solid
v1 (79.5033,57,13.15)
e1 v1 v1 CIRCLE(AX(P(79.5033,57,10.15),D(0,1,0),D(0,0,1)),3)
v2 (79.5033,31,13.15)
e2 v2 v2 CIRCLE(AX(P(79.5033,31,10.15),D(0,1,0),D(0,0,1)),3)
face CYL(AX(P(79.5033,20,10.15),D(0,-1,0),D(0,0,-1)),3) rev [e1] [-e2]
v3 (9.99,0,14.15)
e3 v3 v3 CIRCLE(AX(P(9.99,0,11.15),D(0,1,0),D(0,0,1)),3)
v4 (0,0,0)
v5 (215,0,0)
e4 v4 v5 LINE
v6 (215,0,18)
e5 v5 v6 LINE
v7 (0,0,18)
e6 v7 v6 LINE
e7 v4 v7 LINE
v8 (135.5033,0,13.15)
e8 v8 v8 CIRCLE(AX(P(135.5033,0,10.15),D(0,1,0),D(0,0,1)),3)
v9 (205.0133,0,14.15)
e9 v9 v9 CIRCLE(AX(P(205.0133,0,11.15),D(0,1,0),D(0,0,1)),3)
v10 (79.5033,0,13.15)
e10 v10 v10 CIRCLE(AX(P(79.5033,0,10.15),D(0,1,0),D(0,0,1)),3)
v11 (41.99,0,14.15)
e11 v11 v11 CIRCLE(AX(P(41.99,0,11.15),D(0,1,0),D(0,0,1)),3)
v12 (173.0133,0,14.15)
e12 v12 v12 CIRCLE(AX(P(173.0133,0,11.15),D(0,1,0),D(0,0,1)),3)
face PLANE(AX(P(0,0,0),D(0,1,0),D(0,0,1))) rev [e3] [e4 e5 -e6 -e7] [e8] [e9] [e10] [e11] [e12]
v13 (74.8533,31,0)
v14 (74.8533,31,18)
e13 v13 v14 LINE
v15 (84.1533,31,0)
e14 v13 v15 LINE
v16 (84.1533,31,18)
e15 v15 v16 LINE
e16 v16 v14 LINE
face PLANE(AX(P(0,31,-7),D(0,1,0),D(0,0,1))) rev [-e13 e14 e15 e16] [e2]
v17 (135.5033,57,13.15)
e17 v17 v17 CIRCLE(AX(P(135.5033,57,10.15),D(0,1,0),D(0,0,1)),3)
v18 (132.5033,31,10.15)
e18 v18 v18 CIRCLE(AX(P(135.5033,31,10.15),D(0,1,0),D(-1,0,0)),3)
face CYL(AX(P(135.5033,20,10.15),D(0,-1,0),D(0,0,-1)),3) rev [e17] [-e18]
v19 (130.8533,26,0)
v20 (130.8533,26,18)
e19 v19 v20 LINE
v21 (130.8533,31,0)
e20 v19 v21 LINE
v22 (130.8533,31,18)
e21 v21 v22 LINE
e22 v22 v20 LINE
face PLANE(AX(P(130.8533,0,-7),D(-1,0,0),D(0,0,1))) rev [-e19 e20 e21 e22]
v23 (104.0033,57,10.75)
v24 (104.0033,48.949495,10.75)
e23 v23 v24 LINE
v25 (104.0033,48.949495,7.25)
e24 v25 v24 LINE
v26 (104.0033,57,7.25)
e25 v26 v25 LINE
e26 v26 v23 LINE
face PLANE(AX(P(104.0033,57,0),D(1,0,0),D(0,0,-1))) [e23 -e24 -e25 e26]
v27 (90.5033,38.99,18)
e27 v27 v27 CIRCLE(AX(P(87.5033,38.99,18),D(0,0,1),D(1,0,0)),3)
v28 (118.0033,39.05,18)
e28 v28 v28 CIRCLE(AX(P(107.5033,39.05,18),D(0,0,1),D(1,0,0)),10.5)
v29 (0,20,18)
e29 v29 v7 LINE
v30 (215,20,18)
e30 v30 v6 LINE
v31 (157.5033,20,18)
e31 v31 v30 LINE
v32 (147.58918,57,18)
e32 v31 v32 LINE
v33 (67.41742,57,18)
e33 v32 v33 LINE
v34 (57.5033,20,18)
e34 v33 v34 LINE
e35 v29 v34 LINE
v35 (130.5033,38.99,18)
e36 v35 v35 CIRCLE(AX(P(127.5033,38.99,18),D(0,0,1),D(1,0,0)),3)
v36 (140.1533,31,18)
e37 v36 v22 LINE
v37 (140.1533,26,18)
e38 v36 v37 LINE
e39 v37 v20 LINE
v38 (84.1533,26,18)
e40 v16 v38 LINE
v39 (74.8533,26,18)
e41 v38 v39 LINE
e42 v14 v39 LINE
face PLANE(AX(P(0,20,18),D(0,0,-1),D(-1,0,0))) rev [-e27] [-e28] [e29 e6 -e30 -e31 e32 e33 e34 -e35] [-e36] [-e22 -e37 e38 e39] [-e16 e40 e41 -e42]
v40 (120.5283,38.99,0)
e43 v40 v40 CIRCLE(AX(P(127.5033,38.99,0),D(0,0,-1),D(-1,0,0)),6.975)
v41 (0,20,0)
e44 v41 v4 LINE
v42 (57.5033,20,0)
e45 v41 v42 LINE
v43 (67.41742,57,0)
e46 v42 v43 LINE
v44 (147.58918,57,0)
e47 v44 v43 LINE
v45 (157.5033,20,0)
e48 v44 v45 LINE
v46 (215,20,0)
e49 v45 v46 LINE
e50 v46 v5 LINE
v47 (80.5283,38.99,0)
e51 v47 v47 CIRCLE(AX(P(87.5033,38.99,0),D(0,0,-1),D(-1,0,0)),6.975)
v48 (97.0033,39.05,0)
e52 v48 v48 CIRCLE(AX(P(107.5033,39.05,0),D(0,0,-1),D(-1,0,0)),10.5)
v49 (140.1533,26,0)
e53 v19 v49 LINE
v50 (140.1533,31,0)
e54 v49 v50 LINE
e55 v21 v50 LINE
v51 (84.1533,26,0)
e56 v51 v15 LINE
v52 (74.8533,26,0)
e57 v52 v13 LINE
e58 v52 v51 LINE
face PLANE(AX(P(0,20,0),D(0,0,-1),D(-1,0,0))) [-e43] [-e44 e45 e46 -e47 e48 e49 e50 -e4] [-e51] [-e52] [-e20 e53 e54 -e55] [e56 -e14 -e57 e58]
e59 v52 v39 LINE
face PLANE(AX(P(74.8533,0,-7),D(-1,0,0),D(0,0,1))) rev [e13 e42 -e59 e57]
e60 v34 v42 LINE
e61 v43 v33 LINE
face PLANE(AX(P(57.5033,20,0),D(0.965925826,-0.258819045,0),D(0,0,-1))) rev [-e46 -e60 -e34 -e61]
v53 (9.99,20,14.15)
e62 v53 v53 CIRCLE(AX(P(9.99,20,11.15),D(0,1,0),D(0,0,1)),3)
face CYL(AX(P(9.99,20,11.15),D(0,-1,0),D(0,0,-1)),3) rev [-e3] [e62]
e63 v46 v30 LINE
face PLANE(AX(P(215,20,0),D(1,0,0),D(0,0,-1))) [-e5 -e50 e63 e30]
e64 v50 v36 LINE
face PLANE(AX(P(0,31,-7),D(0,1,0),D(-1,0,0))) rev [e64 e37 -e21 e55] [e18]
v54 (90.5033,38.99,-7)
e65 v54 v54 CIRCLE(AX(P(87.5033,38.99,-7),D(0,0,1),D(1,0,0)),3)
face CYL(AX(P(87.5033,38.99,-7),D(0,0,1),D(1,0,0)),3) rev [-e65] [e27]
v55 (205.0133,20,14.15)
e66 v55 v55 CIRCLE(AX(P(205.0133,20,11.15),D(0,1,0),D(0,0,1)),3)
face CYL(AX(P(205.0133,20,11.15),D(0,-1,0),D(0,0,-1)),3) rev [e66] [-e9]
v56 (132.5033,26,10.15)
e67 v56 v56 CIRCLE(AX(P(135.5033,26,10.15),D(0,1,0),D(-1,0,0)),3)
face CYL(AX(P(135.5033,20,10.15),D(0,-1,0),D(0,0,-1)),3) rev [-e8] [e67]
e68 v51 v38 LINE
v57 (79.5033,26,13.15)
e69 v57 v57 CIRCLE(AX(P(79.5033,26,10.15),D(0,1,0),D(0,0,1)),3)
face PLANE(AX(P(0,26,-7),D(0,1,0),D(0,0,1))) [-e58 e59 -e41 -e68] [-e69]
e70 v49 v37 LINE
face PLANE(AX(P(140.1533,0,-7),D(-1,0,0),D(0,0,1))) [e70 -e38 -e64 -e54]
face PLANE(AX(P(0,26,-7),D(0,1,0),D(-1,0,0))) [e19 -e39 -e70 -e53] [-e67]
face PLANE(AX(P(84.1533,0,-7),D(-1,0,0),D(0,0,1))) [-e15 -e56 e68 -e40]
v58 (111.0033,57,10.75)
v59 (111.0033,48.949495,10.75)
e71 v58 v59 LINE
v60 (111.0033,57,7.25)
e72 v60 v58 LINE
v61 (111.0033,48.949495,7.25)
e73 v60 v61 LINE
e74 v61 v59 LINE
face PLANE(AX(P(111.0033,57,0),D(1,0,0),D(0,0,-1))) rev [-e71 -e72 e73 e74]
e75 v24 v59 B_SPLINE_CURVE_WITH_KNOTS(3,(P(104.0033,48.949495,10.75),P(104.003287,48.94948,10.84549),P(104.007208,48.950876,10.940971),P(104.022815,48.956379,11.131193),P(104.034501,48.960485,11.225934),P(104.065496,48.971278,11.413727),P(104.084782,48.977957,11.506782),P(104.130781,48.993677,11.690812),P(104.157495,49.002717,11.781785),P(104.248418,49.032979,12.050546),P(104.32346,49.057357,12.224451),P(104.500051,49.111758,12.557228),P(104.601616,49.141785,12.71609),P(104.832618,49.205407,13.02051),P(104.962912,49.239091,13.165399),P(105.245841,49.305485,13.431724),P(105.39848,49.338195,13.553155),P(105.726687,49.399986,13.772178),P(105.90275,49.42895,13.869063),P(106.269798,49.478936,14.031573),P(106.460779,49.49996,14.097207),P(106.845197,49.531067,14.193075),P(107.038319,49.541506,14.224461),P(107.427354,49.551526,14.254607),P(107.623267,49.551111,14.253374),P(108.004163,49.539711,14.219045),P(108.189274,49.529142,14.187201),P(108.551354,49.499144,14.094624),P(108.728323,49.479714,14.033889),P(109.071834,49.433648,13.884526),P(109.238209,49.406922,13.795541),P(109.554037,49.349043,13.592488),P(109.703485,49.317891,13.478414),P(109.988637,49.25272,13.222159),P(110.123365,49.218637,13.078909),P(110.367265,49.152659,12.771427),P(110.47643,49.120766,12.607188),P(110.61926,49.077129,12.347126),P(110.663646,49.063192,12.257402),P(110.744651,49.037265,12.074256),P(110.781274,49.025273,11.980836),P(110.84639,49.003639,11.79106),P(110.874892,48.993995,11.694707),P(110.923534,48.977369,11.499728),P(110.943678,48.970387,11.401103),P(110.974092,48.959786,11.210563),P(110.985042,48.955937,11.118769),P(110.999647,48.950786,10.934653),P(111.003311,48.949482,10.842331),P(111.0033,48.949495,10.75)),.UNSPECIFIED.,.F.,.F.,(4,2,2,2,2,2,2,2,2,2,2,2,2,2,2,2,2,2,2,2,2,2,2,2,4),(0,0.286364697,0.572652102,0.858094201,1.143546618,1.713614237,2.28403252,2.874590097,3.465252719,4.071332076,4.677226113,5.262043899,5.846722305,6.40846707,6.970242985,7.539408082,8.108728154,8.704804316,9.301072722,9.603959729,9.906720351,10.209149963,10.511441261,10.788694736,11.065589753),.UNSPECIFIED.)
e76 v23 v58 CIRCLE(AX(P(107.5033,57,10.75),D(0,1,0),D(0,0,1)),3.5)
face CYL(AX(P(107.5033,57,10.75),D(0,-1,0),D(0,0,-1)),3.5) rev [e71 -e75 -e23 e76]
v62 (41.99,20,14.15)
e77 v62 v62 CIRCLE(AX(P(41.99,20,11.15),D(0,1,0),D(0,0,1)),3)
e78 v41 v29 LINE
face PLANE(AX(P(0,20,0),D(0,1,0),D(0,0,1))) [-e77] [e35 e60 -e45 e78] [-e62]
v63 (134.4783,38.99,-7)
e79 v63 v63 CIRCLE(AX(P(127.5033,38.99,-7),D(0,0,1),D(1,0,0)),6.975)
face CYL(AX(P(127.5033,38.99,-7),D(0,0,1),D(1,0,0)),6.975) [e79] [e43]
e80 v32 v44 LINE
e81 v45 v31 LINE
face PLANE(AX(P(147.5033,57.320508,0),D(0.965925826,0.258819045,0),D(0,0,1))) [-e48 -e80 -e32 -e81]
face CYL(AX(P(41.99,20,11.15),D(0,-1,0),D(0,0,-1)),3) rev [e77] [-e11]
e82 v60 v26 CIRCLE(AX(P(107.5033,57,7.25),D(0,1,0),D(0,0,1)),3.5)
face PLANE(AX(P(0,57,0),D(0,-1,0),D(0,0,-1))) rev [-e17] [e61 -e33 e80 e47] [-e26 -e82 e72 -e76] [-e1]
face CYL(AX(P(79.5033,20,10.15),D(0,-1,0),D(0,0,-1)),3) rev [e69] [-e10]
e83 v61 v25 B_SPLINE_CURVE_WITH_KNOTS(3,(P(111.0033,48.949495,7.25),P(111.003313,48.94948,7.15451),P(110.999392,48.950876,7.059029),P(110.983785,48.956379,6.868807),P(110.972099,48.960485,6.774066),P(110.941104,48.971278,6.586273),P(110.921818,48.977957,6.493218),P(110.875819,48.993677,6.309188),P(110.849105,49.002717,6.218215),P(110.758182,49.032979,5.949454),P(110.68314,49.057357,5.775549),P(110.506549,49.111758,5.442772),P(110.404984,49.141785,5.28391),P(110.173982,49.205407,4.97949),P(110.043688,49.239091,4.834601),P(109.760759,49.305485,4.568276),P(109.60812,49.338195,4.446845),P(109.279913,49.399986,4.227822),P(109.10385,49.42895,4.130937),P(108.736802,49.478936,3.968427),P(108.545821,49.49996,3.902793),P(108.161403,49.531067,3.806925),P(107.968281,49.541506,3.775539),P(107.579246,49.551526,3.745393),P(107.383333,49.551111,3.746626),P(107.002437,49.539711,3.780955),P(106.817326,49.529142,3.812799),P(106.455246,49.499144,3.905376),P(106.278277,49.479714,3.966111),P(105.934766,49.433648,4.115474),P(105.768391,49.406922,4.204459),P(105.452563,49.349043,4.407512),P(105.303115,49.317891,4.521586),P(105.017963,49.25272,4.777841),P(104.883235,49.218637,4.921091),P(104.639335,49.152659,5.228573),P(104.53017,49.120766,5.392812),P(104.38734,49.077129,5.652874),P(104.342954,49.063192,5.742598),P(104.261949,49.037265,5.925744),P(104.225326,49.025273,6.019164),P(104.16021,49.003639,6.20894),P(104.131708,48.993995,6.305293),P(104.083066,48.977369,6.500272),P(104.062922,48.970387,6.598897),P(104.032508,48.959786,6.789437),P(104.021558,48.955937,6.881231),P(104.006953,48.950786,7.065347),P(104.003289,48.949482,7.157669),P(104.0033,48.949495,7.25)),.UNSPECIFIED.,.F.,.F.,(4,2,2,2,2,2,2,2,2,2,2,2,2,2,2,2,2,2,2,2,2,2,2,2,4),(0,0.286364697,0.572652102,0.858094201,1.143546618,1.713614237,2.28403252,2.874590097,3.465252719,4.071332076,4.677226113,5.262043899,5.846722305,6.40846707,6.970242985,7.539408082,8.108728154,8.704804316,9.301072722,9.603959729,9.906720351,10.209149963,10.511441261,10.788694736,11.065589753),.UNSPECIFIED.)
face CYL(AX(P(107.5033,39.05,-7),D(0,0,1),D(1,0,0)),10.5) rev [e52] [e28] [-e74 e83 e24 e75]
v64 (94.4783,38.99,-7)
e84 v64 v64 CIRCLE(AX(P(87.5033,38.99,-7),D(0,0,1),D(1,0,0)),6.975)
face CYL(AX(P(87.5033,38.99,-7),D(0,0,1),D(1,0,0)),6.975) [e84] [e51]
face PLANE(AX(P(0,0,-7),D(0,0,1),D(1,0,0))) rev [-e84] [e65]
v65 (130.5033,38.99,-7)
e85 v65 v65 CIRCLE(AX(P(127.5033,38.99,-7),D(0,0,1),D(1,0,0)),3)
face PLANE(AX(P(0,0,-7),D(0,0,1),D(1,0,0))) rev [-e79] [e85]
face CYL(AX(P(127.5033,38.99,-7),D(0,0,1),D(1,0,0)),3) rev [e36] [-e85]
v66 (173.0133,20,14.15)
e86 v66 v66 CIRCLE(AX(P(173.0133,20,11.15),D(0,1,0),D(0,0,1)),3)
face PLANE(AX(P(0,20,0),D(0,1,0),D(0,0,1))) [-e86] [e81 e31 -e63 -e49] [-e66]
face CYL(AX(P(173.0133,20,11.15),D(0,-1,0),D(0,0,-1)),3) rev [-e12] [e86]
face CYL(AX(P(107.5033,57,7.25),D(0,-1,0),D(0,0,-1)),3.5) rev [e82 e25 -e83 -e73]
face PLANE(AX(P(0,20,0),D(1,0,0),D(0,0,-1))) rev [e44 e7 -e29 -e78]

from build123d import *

# Parameters (mm, degrees)
SKETCH1_W           = 215
SKETCH1_H           = 18
SKETCH1_R           = 3
BOSS_EXTRUDE1_DEPTH = 20
SKETCH1_3_W         = 80
SKETCH1_3_H         = 18
SKETCH1_3_R         = 3
BOSS_EXTRUDE2_DEPTH = 47
BOSS_EXTRUDE3_START = 47
SKETCH1_6_W         = 25
SKETCH1_6_H         = 18
SKETCH1_6_W_2       = 27.5
SKETCH1_6_R         = 3
BOSS_EXTRUDE3_DEPTH = 10
SKETCH2_R           = 6.975
SKETCH2_R_2         = 4.475
SKETCH2_R_3         = 3
BOSS_EXTRUDE4_DEPTH = 25
SKETCH2_6_R         = 10.5
SKETCH2_6_R_2       = 3
SKETCH2_6_W         = 9.3
SKETCH2_6_H         = 5
CUT_EXTRUDE5_DEPTH  = 224.828059035
SKETCH1_8_R         = 3
CUT_EXTRUDE6_DEPTH  = 57
CHAMFER1_SIZE       = 37.320508076
CHAMFER1_SIZE_2     = 10
CHAMFER2_SIZE       = 10
CHAMFER2_SIZE_2     = 37.320508076


with BuildPart() as part:
    # Sketch1 → Boss-Extrude1 (new body)
    with BuildSketch(Plane(origin=(0, 0, 0), x_dir=(1, 0, 0), z_dir=(0, 1, 0))):
        with Locations((107.5, -9)):
            Rectangle(SKETCH1_W, SKETCH1_H)
        with Locations(Location((9.99, -11.15, 0), (0, 0, 270))):
            Circle(SKETCH1_R, mode=Mode.SUBTRACT)
        with Locations(Location((41.99, -11.15, 0), (0, 0, 270))):
            Circle(SKETCH1_R, mode=Mode.SUBTRACT)
        with Locations(Location((79.5033, -10.15, 0), (0, 0, 270))):
            Circle(SKETCH1_R, mode=Mode.SUBTRACT)
        with Locations(Location((135.5033, -10.15, 0), (0, 0, 270))):
            Circle(SKETCH1_R, mode=Mode.SUBTRACT)
        with Locations(Location((173.0133, -11.15, 0), (0, 0, 270))):
            Circle(SKETCH1_R, mode=Mode.SUBTRACT)
        with Locations(Location((205.0133, -11.15, 0), (0, 0, 270))):
            Circle(SKETCH1_R, mode=Mode.SUBTRACT)
    extrude(amount=BOSS_EXTRUDE1_DEPTH)

    # Sketch1<3> → Boss-Extrude2 (add)
    with BuildSketch(Plane(origin=(0, 0, 0), x_dir=(1, 0, 0), z_dir=(0, 1, 0))):
        with Locations((107.5033, -9)):
            Rectangle(SKETCH1_3_W, SKETCH1_3_H)
        with Locations((79.5033, -10.15)):
            Circle(SKETCH1_3_R, mode=Mode.SUBTRACT)
        with Locations((135.5033, -10.15)):
            Circle(SKETCH1_3_R, mode=Mode.SUBTRACT)
    extrude(amount=BOSS_EXTRUDE2_DEPTH)

    # Sketch1<6> → Boss-Extrude3 (add)
    # profile 1 of 3: a face of its own
    with BuildSketch(Plane(origin=(0, 0, 0), x_dir=(1, 0, 0), z_dir=(0, 1, 0)).offset(BOSS_EXTRUDE3_START)):
        with Locations((107.5033, -9)):
            Rectangle(SKETCH1_6_W, SKETCH1_6_H)
        with BuildLine():
            ThreePointArc((111.0033, -10.75), (107.5033, -14.25), (104.0033, -10.75))
            Line((104.0033, -10.75), (104.0033, -7.25))
            ThreePointArc((104.0033, -7.25), (107.5033, -3.75), (111.0033, -7.25))
            Line((111.0033, -7.25), (111.0033, -10.75))
        make_face(mode=Mode.SUBTRACT)
    # profile 2 of 3: a face of its own
    with BuildSketch(Plane(origin=(0, 0, 0), x_dir=(1, 0, 0), z_dir=(0, 1, 0)).offset(BOSS_EXTRUDE3_START)):
        with Locations((81.2533, -9)):
            Rectangle(SKETCH1_6_W_2, SKETCH1_6_H)
        with Locations(Location((79.5033, -10.15, 0), (0, 0, 270))):
            Circle(SKETCH1_6_R, mode=Mode.SUBTRACT)
    # profile 3 of 3: a face of its own
    with BuildSketch(Plane(origin=(0, 0, 0), x_dir=(1, 0, 0), z_dir=(0, 1, 0)).offset(BOSS_EXTRUDE3_START)):
        with Locations((133.7533, -9)):
            Rectangle(SKETCH1_6_W_2, SKETCH1_6_H)
        with Locations(Location((135.5033, -10.15, 0), (0, 0, 270))):
            Circle(SKETCH1_6_R, mode=Mode.SUBTRACT)
    extrude(amount=BOSS_EXTRUDE3_DEPTH)

    # Sketch2 → Boss-Extrude4 (add)
    # profile 1 of 4: a face of its own
    with BuildSketch(Plane.XY.offset(18)):
        with Locations((87.5033, 38.99)):
            Circle(SKETCH2_R)
        with Locations((87.5033, 38.99)):
            Circle(SKETCH2_R_2, mode=Mode.SUBTRACT)
    # profile 2 of 4: a face of its own
    with BuildSketch(Plane.XY.offset(18)):
        with Locations((87.5033, 38.99)):
            Circle(SKETCH2_R_2)
        with Locations((87.5033, 38.99)):
            Circle(SKETCH2_R_3, mode=Mode.SUBTRACT)
    # profile 3 of 4: a face of its own
    with BuildSketch(Plane.XY.offset(18)):
        with Locations((127.5033, 38.99)):
            Circle(SKETCH2_R)
        with Locations((127.5033, 38.99)):
            Circle(SKETCH2_R_2, mode=Mode.SUBTRACT)
    # profile 4 of 4: a face of its own
    with BuildSketch(Plane.XY.offset(18)):
        with Locations((127.5033, 38.99)):
            Circle(SKETCH2_R_2)
        with Locations((127.5033, 38.99)):
            Circle(SKETCH2_R_3, mode=Mode.SUBTRACT)
    extrude(amount=-BOSS_EXTRUDE4_DEPTH)

    # Sketch2<6> → Cut-Extrude5 (cut, through all)
    with BuildSketch(Plane.XY.offset(18)):
        with Locations((107.5033, 39.05)):
            Circle(SKETCH2_6_R)
        with Locations((87.5033, 38.99)):
            Circle(SKETCH2_6_R_2)
        with Locations((79.5033, 28.5)):
            Rectangle(SKETCH2_6_W, SKETCH2_6_H)
        with Locations((127.5033, 38.99)):
            Circle(SKETCH2_6_R_2)
        with Locations((135.5033, 28.5)):
            Rectangle(SKETCH2_6_W, SKETCH2_6_H)
    extrude(amount=-CUT_EXTRUDE5_DEPTH, mode=Mode.SUBTRACT)

    # Sketch1<8> → Cut-Extrude6 (cut)
    with BuildSketch(Plane(origin=(0, 0, 0), x_dir=(1, 0, 0), z_dir=(0, 1, 0))):
        with Locations(Location((135.5033, -10.15, 0), (0, 0, 180))):
            Circle(SKETCH1_8_R)
        with Locations(Location((79.5033, -10.15, 0), (0, 0, 270))):
            Circle(SKETCH1_8_R)
    extrude(amount=CUT_EXTRUDE6_DEPTH, mode=Mode.SUBTRACT)

    # Chamfer1
    # the kernel refuses this chamfer: 37.320508076, 10 mm, written as the material it adds along each edge
    with BuildSketch(Plane(origin=(147.5033, 20, 18), x_dir=(-0.009967146577156421, 0.9999503267608394, 0), z_dir=(0, 0, -1))) as chamfer1_piece_1_section:
        Polygon((CHAMFER1_SIZE * 0.999950326753, CHAMFER1_SIZE * 0.00996714657707), (-CHAMFER1_SIZE_2 * 0.00996714657716, CHAMFER1_SIZE_2 * 0.999950326761), (0, 0), align=None)
    chamfer1_piece_1 = extrude(amount=18, mode=Mode.PRIVATE)
    chamfer1_piece_1 = split(chamfer1_piece_1, bisect_by=Plane(origin=(150.477287082, 57, 9), z_dir=(0, -1, 0)), keep=Keep.TOP, mode=Mode.PRIVATE)
    add(chamfer1_piece_1)

    # Chamfer2
    # the kernel refuses this chamfer: 37.320508076, 10 mm, written as the material it adds along each edge
    with BuildSketch(Plane(origin=(67.5033, 20, 0), x_dir=(-0.9905000388259542, -0.137512447021291, 0), z_dir=(0, 0, 1))) as chamfer2_piece_1_section:
        Polygon((CHAMFER2_SIZE * 0.990500038826, -CHAMFER2_SIZE * 0.137512447021), (-CHAMFER2_SIZE_2 * 0.13751244702, -CHAMFER2_SIZE_2 * 0.990500038818), (0, 0), align=None)
    chamfer2_piece_1 = extrude(amount=18, mode=Mode.PRIVATE)
    chamfer2_piece_1 = split(chamfer2_piece_1, bisect_by=Plane(origin=(64.529312918, 57, 9), z_dir=(0, -1, 0)), keep=Keep.TOP, mode=Mode.PRIVATE)
    add(chamfer2_piece_1)


solid = part.part
